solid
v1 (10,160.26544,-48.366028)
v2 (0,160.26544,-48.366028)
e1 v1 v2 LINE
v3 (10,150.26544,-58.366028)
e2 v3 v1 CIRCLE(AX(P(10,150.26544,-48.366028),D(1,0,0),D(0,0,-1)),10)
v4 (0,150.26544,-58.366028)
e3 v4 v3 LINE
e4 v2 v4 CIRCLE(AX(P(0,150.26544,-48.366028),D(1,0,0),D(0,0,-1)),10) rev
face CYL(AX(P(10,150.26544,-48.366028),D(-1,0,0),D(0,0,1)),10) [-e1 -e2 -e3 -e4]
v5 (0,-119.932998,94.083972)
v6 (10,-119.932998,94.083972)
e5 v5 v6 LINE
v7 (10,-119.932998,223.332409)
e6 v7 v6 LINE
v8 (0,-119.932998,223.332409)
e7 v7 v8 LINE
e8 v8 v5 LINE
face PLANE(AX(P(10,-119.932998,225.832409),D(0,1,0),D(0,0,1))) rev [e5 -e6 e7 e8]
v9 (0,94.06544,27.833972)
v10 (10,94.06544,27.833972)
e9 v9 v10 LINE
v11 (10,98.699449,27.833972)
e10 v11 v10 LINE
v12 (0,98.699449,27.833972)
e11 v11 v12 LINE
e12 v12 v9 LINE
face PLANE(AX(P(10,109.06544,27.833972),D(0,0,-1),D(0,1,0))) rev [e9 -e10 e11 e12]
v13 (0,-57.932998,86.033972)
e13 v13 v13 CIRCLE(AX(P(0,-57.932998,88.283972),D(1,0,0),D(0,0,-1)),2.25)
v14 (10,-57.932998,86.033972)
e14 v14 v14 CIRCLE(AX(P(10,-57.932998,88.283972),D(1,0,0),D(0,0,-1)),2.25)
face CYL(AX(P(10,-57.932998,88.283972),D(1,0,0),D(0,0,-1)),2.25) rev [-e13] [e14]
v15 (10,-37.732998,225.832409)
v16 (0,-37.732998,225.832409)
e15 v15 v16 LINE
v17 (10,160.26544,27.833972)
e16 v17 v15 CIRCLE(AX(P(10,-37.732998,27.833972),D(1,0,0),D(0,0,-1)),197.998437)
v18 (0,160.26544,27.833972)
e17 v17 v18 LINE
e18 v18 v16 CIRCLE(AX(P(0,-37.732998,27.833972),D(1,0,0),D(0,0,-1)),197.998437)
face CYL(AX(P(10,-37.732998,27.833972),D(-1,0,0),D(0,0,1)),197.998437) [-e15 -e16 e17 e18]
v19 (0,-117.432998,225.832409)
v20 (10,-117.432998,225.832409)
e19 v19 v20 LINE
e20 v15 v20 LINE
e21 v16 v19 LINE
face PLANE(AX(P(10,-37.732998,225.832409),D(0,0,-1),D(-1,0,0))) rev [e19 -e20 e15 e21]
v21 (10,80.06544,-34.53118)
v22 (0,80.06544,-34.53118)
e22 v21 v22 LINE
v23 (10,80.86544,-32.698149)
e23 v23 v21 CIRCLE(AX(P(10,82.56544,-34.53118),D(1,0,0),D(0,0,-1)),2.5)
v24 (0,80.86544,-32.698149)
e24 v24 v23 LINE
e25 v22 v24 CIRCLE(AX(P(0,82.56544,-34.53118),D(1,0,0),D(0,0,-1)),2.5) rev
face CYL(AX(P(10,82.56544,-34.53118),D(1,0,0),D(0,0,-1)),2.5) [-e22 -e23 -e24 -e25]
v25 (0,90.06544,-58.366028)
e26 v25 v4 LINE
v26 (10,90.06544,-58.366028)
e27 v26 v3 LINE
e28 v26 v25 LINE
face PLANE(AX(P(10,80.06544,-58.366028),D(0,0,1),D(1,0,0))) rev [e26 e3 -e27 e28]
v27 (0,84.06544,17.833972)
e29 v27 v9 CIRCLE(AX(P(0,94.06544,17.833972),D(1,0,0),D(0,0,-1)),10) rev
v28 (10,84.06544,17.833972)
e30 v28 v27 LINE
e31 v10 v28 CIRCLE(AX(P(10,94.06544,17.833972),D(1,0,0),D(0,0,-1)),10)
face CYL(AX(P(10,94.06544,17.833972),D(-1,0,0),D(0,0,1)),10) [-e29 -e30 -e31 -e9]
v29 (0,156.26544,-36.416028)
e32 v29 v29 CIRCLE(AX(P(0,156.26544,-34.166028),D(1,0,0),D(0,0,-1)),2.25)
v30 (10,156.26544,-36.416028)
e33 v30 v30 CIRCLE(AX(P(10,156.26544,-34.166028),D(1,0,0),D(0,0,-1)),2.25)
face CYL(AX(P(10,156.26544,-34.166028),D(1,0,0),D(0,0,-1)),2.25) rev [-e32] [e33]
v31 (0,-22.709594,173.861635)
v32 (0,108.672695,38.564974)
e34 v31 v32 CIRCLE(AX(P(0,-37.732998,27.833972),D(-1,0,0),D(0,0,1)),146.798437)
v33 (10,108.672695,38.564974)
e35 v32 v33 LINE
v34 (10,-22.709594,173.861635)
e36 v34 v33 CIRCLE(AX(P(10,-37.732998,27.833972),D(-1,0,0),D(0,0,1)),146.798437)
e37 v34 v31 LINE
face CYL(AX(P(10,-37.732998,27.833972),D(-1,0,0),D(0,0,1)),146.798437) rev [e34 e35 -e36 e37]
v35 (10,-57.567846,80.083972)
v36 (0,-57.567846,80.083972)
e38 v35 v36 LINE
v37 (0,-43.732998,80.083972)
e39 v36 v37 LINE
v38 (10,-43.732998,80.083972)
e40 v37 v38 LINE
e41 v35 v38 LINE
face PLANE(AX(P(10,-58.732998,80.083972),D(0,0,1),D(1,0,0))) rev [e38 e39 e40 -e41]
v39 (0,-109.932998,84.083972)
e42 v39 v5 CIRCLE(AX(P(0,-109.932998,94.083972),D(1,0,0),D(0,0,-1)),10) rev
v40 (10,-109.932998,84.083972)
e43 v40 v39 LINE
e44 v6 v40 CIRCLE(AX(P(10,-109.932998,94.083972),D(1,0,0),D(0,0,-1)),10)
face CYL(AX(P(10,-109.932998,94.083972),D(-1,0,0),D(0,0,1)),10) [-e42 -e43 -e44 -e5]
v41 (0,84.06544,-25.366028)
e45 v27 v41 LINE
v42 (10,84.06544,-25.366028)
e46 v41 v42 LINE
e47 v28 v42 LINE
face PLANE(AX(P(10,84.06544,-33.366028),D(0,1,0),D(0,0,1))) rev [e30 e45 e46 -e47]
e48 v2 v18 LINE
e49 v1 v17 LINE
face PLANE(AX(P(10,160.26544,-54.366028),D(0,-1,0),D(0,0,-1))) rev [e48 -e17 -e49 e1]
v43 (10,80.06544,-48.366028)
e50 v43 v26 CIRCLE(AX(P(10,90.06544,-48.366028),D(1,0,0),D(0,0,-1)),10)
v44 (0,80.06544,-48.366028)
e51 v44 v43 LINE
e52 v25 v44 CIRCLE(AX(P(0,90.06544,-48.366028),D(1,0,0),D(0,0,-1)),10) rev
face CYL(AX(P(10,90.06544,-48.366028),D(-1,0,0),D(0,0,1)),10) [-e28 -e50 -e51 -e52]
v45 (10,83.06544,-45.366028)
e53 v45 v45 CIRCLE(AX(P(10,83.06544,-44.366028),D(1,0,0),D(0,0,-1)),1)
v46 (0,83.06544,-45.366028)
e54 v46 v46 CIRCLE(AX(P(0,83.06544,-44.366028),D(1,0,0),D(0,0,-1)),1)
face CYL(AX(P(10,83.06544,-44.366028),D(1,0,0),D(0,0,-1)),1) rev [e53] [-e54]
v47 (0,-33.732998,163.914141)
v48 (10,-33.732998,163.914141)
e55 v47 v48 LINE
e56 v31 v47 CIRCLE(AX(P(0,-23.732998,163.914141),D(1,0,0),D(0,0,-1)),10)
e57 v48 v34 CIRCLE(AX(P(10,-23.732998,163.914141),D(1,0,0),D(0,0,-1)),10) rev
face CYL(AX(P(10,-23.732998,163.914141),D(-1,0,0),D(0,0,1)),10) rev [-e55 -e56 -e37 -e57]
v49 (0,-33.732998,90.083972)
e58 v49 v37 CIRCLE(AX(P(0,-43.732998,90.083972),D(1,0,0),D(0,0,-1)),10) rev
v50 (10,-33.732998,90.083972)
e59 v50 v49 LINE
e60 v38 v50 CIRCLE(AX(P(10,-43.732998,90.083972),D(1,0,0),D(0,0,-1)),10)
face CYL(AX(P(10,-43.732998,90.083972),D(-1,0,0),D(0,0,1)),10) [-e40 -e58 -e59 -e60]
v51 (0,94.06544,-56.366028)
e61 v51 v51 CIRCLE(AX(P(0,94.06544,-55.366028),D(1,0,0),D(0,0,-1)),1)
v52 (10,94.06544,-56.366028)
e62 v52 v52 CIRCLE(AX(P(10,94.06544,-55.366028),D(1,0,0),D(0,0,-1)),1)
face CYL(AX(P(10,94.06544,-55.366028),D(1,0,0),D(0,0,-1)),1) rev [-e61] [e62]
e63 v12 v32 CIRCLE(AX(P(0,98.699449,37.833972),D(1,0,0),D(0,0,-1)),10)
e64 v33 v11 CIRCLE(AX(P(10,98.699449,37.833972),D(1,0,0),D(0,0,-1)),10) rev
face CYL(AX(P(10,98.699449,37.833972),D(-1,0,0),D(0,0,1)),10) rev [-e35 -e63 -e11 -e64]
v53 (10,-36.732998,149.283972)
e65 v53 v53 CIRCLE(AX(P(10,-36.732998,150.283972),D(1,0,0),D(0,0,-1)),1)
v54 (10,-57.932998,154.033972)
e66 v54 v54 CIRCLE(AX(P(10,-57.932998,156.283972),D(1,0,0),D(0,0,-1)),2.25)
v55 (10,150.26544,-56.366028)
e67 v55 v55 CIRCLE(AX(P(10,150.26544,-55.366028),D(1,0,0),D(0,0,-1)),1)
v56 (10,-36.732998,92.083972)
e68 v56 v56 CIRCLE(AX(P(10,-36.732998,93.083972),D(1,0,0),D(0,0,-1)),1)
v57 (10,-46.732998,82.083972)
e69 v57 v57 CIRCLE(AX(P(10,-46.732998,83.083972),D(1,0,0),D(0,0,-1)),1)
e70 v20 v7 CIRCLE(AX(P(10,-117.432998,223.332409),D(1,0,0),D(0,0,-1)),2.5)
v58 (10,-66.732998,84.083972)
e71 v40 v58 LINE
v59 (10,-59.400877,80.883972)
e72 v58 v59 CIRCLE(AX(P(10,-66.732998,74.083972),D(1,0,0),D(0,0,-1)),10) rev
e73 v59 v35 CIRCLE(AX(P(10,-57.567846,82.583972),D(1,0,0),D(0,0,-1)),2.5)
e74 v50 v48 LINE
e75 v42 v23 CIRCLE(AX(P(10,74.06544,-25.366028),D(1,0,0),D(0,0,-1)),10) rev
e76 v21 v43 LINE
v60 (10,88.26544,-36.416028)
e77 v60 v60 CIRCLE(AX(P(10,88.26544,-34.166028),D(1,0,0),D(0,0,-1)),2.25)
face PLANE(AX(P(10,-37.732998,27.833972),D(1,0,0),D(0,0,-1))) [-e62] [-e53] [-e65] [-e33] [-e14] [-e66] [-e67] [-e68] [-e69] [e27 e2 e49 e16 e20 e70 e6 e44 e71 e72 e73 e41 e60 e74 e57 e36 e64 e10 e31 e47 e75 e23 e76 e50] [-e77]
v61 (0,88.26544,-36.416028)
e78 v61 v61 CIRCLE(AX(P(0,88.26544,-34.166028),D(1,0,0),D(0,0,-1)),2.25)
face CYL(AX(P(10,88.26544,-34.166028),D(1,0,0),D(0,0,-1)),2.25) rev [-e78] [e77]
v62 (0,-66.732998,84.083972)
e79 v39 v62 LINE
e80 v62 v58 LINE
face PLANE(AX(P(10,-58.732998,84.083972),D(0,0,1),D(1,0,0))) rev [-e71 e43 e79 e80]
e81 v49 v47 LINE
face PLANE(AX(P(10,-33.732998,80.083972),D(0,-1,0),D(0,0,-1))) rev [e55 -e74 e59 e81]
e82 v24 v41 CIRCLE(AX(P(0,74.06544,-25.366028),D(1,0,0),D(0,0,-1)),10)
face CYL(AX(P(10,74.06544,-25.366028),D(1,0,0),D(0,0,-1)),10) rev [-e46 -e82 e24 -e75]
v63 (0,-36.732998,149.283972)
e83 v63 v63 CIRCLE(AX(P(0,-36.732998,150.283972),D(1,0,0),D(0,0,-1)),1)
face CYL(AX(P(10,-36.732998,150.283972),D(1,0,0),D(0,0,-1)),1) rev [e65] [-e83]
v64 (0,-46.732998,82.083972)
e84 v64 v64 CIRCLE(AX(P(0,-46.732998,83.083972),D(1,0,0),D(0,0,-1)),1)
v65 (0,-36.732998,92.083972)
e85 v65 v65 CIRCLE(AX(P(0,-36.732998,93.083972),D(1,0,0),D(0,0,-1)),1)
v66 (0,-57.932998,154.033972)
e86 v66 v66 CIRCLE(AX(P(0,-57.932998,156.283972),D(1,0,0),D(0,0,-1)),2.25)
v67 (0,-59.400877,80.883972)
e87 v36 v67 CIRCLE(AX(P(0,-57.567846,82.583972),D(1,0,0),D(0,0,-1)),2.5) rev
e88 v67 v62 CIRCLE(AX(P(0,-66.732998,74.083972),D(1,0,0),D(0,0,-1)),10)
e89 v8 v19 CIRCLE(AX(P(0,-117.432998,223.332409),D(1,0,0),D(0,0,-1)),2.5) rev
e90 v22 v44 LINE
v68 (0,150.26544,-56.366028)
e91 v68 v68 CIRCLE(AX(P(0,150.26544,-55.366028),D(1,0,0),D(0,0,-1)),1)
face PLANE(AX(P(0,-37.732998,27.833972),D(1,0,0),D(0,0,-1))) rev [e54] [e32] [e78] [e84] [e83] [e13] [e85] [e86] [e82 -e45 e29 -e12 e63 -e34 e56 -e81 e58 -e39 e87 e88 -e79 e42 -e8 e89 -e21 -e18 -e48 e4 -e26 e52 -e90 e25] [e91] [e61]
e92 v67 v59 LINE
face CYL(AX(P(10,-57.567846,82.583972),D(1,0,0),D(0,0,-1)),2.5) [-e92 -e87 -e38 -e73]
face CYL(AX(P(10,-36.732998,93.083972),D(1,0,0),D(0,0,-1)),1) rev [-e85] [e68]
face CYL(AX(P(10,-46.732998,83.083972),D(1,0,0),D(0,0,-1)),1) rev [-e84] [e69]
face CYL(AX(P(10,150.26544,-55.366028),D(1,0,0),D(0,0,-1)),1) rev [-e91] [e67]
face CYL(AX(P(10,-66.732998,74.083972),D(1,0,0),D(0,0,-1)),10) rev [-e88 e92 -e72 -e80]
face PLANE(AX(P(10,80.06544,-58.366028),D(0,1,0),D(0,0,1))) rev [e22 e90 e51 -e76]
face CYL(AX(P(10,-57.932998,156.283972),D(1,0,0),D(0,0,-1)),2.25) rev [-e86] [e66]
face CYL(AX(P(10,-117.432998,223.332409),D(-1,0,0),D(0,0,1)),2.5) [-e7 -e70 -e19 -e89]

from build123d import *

# Parameters (mm, degrees)
BOSS_EXTRUDE1_DEPTH   = 10
M4_CLEARANCE_HOLE1_D  = 4.5
F_2_0MM_DOWEL_HOLE1_D = 2
FILLET1_R             = 10
FILLET2_R             = 2.5


with BuildPart() as part:
    # Sketch1 → Boss-Extrude1 (new body)
    with BuildSketch(Plane(origin=(0, 0, 0), x_dir=(0, 0, -1), z_dir=(1, 0, 0))):
        with BuildLine():
            Line((-27.833971588, 109.065439697), (-27.833971588, 84.065439697))
            Line((-27.833971588, 84.065439697), (33.366028214, 84.065439697))
            Line((33.366028214, 84.065439697), (33.366028214, 80.065439697))
            Line((33.366028214, 80.065439697), (58.366028214, 80.065439697))
            Line((58.366028214, 80.065439697), (58.366028214, 160.265439697))
            Line((58.366028214, 160.265439697), (54.366028214, 160.265439697))
            Line((54.366028214, 160.265439697), (-27.833971588, 160.265439697))
            ThreePointArc((-27.833971588, 160.265439697), (-167.840009366, 102.273040036), (-225.832409027, -37.732997742))
            Line((-225.832409027, -37.732997742), (-225.832409027, -119.932997544))
            Line((-225.832409027, -119.932997544), (-84.083971786, -119.932997544))
            Line((-84.083971786, -119.932997544), (-84.083971786, -58.732997742))
            Line((-84.083971786, -58.732997742), (-80.083971786, -58.732997742))
            Line((-80.083971786, -58.732997742), (-80.083971786, -33.732997742))
            Line((-80.083971786, -33.732997742), (-174.577902415, -33.732997742))
            ThreePointArc((-174.577902415, -33.732997742), (-130.212161367, 67.473881749), (-27.833971588, 109.065439697))
        make_face()
    extrude(amount=BOSS_EXTRUDE1_DEPTH)

    # M4 Clearance Hole1 (through all)
    with Locations(Plane(origin=(10, 0, 0), x_dir=(0, 0, -1), z_dir=(1, 0, 0))):
        with Locations((-156.283971786, -57.932997742), (-88.283971786, -57.932997742), (34.166028214, 156.265439697), (34.166028214, 88.265439697)):
            Hole(M4_CLEARANCE_HOLE1_D / 2)

    # Ø2.0mm Dowel Hole1 (through all)
    with Locations(Plane(origin=(10, 0, 0), x_dir=(0, 0, -1), z_dir=(1, 0, 0))):
        with Locations((44.366028214, 83.065439697), (55.366028214, 94.065439697), (55.366028214, 150.265439697), (-150.283971786, -36.732997742), (-93.083971786, -36.732997742), (-83.083971786, -46.732997742)):
            Hole(F_2_0MM_DOWEL_HOLE1_D / 2)

    # Fillet1
    # the kernel refuses this fillet: 10 mm, written as the material it adds along each edge
    with BuildSketch(Plane(origin=(0, -58.732997742, 84.083971786), x_dir=(0, 0, -1), z_dir=(1, 0, 0))) as fillet1_piece_1:
        with BuildLine():
            CenterArc((10, -8), FILLET1_R, 126.869897646, 53.130102354)
            Line((0, -8), (0, 0))
            Line((0, 0), (4, 0))
        make_face()
    extrude(amount=10)
    with BuildSketch(Plane(origin=(0, 84.065439697, -33.366028214), x_dir=(0, 0, 1), z_dir=(1, 0, 0))) as fillet1_piece_2:
        with BuildLine():
            CenterArc((8, 10), FILLET1_R, 216.869897646, 53.130102354)
            Line((0, 4), (0, 0))
            Line((0, 0), (8, 0))
        make_face()
    extrude(amount=10)
    with BuildSketch(Plane(origin=(0, -33.732997742, 174.577902415), x_dir=(0, 0.9978956594350473, -0.06484021036896881), z_dir=(1, 0, 0))) as fillet1_piece_3:
        with BuildLine():
            CenterArc((10.670397133, -9.992919204), FILLET1_R, 87.843724259, 95.873954258)
            Line((0.691440539, -10.641321308), (0, 0))
            ThreePointArc((0, 0), (5.523324707, 0.103944977), (11.046649415, 0))
        make_face()
    extrude(amount=10)
    with BuildSketch(Plane(origin=(0, 109.065439697, 27.833971588), x_dir=(0, -1, 0), z_dir=(1, 0, 0))) as fillet1_piece_4:
        with BuildLine():
            CenterArc((10.365990837, -10), FILLET1_R, 90, 94.192074979)
            ThreePointArc((0.392744859, -10.731002502), (0.098219073, -5.369093574), (0, 0))
            Line((0, 0), (10.365990837, 0))
        make_face()
    extrude(amount=10)
    # the kernel refuses this fillet: 10 mm, written as the material it takes off along each edge
    with BuildSketch(Plane(origin=(-25, -119.932997544, 84.083971786), x_dir=(0, 1, 0), z_dir=(1, 0, 0)), Plane(origin=(-25, -33.732997742, 80.083971786), x_dir=(0, 0, 1), z_dir=(1, 0, 0))) as fillet1_2_piece_1:
        with BuildLine():
            CenterArc((FILLET1_R, FILLET1_R), FILLET1_R, 180, 90)
            Line((0, FILLET1_R), (0, 0))
            Line((0, 0), (FILLET1_R, 0))
        make_face()
    extrude(amount=60, mode=Mode.SUBTRACT)
    with BuildSketch(Plane(origin=(-25, 84.065439697, 27.833971588), x_dir=(0, 1, 0), z_dir=(1, 0, 0)), Plane(origin=(-25, 160.265439697, -58.366028214), x_dir=(0, -1, 0), z_dir=(1, 0, 0)), Plane(origin=(-25, 80.065439697, -58.366028214), x_dir=(0, 0, 1), z_dir=(1, 0, 0))) as fillet1_2_piece_2:
        with BuildLine():
            CenterArc((FILLET1_R, -FILLET1_R), FILLET1_R, 90, 90)
            Line((0, -FILLET1_R), (0, 0))
            Line((0, 0), (FILLET1_R, 0))
        make_face()
    extrude(amount=60, mode=Mode.SUBTRACT)

    # Fillet2
    fillet2_edges = [part.edges().sort_by_distance(p)[0] for p in [
        (5, 80.065439697, -33.366028214),
        (5, -58.732997742, 80.083971786),
        (5, -119.932997544, 225.832409027),
    ]]
    fillet(fillet2_edges, radius=FILLET2_R)


solid = part.part
